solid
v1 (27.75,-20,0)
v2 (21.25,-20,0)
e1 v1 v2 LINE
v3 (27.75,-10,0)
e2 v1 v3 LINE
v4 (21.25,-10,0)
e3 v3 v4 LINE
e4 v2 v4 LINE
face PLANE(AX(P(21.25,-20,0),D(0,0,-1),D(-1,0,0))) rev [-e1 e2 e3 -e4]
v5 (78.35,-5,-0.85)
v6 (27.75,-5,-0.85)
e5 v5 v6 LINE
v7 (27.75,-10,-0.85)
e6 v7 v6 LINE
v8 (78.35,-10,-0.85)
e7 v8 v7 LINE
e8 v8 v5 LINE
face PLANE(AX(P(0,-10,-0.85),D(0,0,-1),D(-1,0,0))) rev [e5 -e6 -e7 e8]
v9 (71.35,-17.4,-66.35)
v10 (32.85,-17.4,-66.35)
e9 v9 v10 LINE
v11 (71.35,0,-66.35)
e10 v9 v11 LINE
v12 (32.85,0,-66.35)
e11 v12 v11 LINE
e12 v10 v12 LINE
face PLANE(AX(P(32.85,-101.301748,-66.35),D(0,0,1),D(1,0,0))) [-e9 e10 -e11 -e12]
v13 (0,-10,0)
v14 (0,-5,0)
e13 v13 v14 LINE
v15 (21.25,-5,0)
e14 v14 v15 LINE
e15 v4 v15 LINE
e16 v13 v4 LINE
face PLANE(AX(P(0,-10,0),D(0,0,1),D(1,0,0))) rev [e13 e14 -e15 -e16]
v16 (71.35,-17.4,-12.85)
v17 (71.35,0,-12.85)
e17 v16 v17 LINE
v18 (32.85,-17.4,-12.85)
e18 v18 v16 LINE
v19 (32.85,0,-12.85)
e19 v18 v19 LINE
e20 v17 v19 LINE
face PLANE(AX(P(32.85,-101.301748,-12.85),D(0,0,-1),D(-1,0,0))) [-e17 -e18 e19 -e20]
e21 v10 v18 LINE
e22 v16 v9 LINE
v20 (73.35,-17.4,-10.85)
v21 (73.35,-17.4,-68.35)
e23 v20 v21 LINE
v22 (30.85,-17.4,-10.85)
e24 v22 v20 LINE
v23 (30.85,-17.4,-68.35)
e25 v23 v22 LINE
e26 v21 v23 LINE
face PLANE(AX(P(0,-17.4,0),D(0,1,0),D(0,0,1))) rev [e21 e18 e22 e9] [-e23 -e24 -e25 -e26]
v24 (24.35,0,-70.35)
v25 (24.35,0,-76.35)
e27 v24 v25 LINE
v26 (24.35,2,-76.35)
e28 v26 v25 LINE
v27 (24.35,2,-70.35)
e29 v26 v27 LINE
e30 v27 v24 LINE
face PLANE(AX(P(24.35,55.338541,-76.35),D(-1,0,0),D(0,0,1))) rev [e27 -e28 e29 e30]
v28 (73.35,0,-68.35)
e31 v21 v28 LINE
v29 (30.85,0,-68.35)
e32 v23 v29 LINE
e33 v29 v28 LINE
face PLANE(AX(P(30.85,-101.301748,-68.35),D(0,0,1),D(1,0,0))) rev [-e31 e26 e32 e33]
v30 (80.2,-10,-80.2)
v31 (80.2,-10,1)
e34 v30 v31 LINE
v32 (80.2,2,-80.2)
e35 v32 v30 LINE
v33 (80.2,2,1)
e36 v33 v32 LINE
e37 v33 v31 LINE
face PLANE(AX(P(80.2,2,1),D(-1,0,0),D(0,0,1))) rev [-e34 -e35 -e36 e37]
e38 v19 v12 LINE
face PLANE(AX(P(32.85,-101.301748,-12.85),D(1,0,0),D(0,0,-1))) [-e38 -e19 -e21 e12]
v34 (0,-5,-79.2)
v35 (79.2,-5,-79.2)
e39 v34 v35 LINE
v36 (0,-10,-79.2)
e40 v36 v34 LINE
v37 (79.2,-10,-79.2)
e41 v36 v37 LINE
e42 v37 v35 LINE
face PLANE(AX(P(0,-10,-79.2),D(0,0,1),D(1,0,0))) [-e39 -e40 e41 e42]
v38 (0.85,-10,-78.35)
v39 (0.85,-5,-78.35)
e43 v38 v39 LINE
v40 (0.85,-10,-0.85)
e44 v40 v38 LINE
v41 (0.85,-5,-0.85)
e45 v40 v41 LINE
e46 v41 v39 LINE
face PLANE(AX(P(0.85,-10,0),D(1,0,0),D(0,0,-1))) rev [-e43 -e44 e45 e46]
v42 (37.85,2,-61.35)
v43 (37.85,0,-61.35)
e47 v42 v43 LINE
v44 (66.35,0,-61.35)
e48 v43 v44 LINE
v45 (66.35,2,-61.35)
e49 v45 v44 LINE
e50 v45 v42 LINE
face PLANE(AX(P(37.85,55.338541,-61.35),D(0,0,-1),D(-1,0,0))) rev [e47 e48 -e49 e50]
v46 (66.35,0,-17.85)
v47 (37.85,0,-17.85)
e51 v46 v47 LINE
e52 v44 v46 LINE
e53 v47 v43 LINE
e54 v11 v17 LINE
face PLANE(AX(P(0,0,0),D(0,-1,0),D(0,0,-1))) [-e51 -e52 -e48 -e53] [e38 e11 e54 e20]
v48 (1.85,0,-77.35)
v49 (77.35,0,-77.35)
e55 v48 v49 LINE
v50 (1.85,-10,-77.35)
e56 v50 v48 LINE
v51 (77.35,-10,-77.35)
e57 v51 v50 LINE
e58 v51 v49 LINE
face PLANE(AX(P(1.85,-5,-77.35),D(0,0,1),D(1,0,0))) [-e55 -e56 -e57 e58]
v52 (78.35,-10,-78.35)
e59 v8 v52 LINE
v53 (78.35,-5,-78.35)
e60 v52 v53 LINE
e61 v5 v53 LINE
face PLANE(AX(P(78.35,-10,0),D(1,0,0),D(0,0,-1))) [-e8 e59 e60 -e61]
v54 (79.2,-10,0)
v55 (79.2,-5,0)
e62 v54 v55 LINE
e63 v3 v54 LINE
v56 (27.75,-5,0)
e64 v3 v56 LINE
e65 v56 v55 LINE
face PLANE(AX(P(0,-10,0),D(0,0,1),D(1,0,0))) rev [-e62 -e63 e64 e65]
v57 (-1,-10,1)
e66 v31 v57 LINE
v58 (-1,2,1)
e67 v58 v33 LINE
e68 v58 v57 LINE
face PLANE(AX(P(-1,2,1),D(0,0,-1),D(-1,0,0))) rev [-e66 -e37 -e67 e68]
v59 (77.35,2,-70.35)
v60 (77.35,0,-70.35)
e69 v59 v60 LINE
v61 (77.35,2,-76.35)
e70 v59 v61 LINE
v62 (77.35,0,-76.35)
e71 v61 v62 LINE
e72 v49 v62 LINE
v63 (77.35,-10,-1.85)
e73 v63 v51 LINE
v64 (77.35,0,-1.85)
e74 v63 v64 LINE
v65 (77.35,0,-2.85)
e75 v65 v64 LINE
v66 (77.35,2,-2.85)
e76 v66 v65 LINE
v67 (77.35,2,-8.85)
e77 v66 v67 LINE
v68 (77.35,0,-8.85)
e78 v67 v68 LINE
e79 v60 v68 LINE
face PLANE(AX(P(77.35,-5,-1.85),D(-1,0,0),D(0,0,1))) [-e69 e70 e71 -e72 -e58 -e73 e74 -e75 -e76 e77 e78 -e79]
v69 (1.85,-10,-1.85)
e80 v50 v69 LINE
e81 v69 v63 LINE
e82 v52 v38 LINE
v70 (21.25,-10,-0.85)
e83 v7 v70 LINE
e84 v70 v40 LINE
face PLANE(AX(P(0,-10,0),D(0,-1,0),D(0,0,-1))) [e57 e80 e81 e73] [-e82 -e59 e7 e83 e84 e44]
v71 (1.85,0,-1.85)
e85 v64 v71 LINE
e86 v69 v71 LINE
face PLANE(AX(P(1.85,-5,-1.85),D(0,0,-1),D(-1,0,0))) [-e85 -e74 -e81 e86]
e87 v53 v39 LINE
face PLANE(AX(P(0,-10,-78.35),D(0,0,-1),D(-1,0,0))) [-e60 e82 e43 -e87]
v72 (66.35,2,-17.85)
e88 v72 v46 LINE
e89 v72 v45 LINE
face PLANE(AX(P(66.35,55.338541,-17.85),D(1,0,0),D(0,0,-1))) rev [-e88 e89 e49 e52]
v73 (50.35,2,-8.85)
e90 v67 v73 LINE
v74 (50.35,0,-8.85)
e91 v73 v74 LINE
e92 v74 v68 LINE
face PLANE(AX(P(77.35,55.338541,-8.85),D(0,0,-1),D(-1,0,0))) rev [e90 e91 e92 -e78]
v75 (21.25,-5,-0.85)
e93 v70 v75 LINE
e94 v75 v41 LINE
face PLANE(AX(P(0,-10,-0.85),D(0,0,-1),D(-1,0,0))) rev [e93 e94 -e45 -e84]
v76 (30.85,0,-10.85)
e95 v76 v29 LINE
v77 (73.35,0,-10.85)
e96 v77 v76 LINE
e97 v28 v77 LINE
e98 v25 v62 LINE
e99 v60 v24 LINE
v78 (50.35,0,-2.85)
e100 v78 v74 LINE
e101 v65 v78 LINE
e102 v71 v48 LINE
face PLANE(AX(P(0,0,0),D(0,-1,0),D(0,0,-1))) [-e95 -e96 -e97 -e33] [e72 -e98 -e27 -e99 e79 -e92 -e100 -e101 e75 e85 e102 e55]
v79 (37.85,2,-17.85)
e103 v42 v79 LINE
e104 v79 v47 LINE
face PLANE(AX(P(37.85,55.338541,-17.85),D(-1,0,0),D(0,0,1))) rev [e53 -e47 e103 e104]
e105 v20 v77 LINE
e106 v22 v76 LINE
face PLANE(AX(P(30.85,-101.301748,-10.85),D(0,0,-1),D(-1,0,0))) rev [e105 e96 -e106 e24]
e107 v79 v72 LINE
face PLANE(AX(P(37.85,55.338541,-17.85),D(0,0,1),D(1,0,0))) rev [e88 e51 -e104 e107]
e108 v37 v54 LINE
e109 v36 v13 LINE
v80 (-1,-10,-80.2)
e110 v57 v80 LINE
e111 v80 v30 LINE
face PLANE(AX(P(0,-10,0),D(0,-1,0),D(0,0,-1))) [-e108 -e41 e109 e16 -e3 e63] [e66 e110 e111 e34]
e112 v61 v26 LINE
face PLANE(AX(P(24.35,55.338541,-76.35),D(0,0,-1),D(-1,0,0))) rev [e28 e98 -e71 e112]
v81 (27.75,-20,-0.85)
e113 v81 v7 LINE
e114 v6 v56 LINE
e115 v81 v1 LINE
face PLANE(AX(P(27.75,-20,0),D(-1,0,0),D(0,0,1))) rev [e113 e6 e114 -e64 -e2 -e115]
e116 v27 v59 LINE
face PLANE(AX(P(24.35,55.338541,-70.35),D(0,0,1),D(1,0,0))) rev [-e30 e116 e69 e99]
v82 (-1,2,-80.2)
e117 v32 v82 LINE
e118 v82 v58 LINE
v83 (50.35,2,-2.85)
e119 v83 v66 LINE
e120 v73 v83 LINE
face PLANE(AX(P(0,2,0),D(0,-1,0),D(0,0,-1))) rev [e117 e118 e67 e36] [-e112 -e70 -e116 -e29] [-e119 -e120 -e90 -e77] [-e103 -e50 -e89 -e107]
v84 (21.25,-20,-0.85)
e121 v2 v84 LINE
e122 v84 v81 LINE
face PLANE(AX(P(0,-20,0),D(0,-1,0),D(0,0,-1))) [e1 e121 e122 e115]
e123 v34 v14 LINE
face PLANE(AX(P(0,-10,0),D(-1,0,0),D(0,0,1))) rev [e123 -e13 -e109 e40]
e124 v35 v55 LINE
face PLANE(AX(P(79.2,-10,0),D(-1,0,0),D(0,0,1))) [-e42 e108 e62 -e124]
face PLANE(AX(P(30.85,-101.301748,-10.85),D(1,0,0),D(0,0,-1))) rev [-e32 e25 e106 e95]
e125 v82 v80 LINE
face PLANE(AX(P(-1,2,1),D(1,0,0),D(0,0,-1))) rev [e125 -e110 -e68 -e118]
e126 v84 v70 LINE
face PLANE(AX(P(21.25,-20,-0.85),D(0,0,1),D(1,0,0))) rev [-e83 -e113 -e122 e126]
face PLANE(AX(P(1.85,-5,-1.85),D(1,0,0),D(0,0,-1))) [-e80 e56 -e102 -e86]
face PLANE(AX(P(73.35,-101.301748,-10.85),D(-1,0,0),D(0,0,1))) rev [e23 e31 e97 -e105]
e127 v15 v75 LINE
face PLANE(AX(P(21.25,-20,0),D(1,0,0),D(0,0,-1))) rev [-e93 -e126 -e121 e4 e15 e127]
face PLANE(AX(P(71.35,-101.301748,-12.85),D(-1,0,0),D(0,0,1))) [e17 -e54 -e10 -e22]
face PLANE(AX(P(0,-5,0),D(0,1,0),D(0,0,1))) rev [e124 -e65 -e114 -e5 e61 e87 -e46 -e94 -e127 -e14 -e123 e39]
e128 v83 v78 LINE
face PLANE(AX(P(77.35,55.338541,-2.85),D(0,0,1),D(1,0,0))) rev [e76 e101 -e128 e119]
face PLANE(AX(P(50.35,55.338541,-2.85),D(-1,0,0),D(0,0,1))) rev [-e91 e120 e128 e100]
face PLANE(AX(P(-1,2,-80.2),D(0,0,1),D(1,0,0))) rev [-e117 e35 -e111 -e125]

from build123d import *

# Parameters (mm, degrees)
SKETCH5_W                 = 81.2
SKETCH5_H                 = 81.2
BOSS_EXTRUDE3_DEPTH       = 2
SKETCH9_W                 = 81.2
SKETCH9_H                 = 81.2
SKETCH9_W_2               = 75.5
SKETCH9_H_2               = 75.5
BOSS_EXTRUDE5_DEPTH       = 5
SKETCH6_W                 = 42.5
SKETCH6_H                 = 57.5
SKETCH6_W_2               = 38.5
SKETCH6_H_2               = 53.5
BOSS_EXTRUDE4_DEPTH       = 17.4
SKETCH7_W                 = 28.5
SKETCH7_H                 = 43.5
SKETCH7_W_2               = 27
SKETCH7_H_2               = 6
SKETCH7_W_3               = 53
CUT_EXTRUDE1_DEPTH        = 2
SKETCH10_W                = 6.5
SKETCH10_H                = 0.85
BOSS_EXTRUDE6_DEPTH       = 15
BOSS_EXTRUDE7_OUTLINE_W   = 81.2
BOSS_EXTRUDE7_OUTLINE_H   = 81.2
BOSS_EXTRUDE7_OUTLINE_W_2 = 79.2
BOSS_EXTRUDE7_OUTLINE_H_2 = 79.2
BOSS_EXTRUDE7_OUTLINE_W_3 = 77.5
BOSS_EXTRUDE7_OUTLINE_H_3 = 77.5
BOSS_EXTRUDE7_OUTLINE_W_4 = 75.5
BOSS_EXTRUDE7_OUTLINE_H_4 = 75.5
BOSS_EXTRUDE7_DEPTH       = 5


# Read off the part's stored shape, not the designer's step: Boss-Extrude7
with BuildPart() as part:
    # Sketch5 → Boss-Extrude3 (new body)
    with BuildSketch(Plane(origin=(0, 0, 0), x_dir=(1, 0, 0), z_dir=(0, 1, 0))):
        with Locations((39.6, 39.6)):
            Rectangle(SKETCH5_W, SKETCH5_H)
    extrude(amount=BOSS_EXTRUDE3_DEPTH)

    # Sketch9 → Boss-Extrude5 (add)
    with BuildSketch(Plane.XZ):
        with Locations((39.6, -39.6)):
            Rectangle(SKETCH9_W, SKETCH9_H)
        with Locations((39.6, -39.6)):
            Rectangle(SKETCH9_W_2, SKETCH9_H_2, mode=Mode.SUBTRACT)
    extrude(amount=BOSS_EXTRUDE5_DEPTH)

    # Sketch6 → Boss-Extrude4 (add)
    with BuildSketch(Plane.XZ):
        with Locations((52.1, -39.6)):
            Rectangle(SKETCH6_W, SKETCH6_H)
        with Locations((52.1, -39.6)):
            Rectangle(SKETCH6_W_2, SKETCH6_H_2, mode=Mode.SUBTRACT)
    extrude(amount=BOSS_EXTRUDE4_DEPTH)

    # Sketch7 → Cut-Extrude1 (cut)
    with BuildSketch(Plane.XZ):
        with Locations((52.1, -39.6)):
            Rectangle(SKETCH7_W, SKETCH7_H)
        with Locations((63.85, -5.85)):
            Rectangle(SKETCH7_W_2, SKETCH7_H_2)
        with Locations((50.85, -73.35)):
            Rectangle(SKETCH7_W_3, SKETCH7_H_2)
    extrude(amount=-CUT_EXTRUDE1_DEPTH, mode=Mode.SUBTRACT)

    # Sketch10 → Boss-Extrude6 (add)
    with BuildSketch(Plane.XZ.offset(5)):
        with Locations((24.5, -0.425)):
            Rectangle(SKETCH10_W, SKETCH10_H)
    extrude(amount=BOSS_EXTRUDE6_DEPTH)

    # Boss-Extrude7 outline → Boss-Extrude7 (add)
    # profile 1 of 2: a face of its own
    with BuildSketch(Plane(origin=(0, -5, 0), x_dir=(-1, 0, 0), z_dir=(0, -1, 0))):
        with Locations((-39.6, 39.6)):
            Rectangle(BOSS_EXTRUDE7_OUTLINE_W, BOSS_EXTRUDE7_OUTLINE_H)
        with Locations((-39.6, 39.6)):
            Rectangle(BOSS_EXTRUDE7_OUTLINE_W_2, BOSS_EXTRUDE7_OUTLINE_H_2, mode=Mode.SUBTRACT)
    # profile 2 of 2: a face of its own
    with BuildSketch(Plane(origin=(0, -5, 0), x_dir=(-1, 0, 0), z_dir=(0, -1, 0))):
        with Locations((-39.6, 39.6)):
            Rectangle(BOSS_EXTRUDE7_OUTLINE_W_3, BOSS_EXTRUDE7_OUTLINE_H_3)
        with Locations((-39.6, 39.6)):
            Rectangle(BOSS_EXTRUDE7_OUTLINE_W_4, BOSS_EXTRUDE7_OUTLINE_H_4, mode=Mode.SUBTRACT)
    extrude(amount=BOSS_EXTRUDE7_DEPTH)


solid = part.part
